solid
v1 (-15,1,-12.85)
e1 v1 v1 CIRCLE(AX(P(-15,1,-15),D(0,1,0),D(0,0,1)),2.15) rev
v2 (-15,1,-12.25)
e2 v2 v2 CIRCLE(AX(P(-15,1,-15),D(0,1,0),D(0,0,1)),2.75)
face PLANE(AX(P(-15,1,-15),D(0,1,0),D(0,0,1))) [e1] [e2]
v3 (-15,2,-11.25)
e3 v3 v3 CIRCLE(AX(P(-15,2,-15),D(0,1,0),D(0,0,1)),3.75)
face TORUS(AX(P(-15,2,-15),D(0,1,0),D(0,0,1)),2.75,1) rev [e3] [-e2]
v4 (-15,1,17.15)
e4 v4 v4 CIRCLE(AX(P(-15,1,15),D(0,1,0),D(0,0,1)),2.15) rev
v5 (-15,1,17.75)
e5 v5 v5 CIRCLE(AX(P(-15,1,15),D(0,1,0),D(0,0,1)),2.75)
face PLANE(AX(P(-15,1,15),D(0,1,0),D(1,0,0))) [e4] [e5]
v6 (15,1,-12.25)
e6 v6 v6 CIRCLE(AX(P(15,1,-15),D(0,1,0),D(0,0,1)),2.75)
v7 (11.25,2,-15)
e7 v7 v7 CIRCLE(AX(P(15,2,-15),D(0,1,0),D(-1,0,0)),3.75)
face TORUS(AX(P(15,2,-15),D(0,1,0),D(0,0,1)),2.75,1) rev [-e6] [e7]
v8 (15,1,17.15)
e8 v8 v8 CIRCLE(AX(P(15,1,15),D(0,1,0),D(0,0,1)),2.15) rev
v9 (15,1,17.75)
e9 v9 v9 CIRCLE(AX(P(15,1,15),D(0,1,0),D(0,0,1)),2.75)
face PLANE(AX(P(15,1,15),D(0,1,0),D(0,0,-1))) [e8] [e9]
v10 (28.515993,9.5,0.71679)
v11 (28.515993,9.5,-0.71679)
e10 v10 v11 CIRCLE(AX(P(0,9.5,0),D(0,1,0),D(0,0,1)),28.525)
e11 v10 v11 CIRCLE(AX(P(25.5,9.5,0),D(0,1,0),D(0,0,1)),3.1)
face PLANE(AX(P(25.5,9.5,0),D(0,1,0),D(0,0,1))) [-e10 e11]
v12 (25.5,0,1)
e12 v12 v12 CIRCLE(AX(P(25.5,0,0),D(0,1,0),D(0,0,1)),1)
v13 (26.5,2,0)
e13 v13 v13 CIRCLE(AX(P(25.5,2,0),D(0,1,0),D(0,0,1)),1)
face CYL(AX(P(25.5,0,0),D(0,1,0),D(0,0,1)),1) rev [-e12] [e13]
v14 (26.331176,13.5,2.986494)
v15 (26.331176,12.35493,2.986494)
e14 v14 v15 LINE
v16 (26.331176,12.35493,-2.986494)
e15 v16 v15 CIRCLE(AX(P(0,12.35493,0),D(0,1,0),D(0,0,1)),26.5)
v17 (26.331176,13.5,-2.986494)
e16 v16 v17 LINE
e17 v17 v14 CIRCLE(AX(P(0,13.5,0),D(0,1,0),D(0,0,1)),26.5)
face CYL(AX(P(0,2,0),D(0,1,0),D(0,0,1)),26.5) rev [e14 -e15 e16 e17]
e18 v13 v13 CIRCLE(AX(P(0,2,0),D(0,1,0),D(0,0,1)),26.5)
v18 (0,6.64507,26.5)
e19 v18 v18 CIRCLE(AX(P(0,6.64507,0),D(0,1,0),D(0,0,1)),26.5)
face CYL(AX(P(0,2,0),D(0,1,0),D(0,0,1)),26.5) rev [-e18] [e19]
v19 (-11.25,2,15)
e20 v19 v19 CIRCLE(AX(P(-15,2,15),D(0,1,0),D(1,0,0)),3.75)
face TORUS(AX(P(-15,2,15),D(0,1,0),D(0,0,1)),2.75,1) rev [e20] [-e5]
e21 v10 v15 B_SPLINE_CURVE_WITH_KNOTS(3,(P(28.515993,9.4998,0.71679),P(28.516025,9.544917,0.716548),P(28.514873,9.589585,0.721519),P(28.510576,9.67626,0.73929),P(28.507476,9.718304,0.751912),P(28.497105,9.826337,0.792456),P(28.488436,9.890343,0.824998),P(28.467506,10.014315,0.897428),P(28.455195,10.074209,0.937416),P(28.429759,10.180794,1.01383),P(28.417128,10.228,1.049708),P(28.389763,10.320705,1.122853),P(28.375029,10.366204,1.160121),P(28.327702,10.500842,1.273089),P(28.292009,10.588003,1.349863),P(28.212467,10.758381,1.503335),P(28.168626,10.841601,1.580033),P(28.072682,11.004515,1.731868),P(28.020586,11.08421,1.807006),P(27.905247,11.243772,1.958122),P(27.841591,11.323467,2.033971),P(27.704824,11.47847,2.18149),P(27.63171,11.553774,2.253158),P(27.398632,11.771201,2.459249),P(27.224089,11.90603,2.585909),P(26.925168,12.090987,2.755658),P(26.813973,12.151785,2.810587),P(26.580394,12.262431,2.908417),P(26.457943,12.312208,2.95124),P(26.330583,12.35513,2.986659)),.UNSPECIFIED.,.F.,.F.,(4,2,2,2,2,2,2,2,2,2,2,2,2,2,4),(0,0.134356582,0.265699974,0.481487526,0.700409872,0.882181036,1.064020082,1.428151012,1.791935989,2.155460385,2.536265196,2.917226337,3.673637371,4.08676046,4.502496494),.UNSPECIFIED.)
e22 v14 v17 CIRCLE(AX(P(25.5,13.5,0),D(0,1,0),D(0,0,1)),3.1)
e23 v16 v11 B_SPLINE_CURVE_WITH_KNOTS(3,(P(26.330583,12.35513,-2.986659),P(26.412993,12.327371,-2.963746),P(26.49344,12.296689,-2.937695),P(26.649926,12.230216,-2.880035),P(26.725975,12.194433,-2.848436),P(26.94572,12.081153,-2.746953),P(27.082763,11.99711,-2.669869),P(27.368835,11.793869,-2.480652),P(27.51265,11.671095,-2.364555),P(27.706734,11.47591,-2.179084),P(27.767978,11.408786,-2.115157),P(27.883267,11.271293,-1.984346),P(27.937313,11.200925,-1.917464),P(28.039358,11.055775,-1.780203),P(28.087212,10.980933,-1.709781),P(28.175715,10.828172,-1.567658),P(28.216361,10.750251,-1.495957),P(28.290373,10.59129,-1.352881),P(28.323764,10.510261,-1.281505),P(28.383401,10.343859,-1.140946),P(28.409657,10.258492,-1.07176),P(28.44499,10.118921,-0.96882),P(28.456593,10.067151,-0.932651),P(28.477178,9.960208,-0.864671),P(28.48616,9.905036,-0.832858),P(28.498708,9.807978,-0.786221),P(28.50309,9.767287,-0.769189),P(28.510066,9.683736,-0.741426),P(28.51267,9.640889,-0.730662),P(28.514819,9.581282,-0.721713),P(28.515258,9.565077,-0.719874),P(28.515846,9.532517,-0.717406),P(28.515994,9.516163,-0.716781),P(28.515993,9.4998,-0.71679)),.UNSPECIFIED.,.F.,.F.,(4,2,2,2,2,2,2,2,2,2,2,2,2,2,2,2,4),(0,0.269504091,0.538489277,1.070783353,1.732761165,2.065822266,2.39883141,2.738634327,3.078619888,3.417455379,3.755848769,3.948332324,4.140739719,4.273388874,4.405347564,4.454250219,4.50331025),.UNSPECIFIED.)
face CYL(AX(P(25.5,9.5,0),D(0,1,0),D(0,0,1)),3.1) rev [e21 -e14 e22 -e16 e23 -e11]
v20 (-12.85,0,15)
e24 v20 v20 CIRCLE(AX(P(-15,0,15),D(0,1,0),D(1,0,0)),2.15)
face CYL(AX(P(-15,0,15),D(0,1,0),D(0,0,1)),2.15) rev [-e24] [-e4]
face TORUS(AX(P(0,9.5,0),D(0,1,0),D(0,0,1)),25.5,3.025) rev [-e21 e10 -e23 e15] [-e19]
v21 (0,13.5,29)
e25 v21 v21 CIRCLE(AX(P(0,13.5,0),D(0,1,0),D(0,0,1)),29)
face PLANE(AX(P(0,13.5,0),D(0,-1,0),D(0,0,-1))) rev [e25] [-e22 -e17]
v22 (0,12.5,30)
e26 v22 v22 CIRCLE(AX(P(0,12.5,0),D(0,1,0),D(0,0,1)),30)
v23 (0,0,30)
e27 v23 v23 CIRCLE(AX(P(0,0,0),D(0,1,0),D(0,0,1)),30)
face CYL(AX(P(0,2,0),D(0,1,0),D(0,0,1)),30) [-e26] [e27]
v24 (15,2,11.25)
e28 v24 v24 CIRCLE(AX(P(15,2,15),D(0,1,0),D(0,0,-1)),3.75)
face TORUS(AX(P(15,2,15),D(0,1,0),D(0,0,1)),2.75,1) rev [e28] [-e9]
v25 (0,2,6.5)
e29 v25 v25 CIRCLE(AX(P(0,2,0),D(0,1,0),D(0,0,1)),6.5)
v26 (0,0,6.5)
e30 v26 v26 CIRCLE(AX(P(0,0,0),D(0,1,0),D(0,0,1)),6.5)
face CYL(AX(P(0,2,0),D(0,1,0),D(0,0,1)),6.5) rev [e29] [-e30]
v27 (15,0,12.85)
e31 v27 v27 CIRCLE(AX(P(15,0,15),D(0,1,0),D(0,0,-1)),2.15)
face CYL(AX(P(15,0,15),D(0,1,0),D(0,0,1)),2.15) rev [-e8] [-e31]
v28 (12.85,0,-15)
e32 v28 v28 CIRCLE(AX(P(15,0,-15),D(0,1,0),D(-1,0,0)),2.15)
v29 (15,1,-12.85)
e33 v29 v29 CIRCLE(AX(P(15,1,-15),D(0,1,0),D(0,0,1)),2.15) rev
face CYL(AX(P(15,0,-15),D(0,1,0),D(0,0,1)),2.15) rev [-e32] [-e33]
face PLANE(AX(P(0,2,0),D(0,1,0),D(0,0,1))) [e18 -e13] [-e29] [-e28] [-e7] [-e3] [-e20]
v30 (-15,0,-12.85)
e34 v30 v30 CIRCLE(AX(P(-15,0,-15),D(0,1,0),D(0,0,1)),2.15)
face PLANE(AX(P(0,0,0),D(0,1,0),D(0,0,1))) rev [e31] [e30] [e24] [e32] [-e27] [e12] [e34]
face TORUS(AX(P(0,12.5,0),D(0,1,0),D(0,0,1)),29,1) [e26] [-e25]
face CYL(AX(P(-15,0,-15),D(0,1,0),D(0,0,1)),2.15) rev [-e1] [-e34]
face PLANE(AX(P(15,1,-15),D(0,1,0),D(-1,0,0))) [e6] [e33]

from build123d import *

# Parameters (mm, degrees)
SKETCH_3_R                       = 3.1
CUT_EXTRUDE_2_DEPTH              = 4
CUT_EXTRUDE_3_DEPTH              = 44.957365734
SKETCH_5_R                       = 3.75
CUT_EXTRUDE_4_DEPTH              = 1
FILLET_1_R                       = 1
PATTERN_CIRCULAR_1_COUNT         = 4
FILLET_1_OF_PATTERN_CIRCULAR_1_R = 1
SKETCH_6_R                       = 1
CUT_EXTRUDE_5_DEPTH              = 44.957365734


with BuildPart() as part:
    # 草图1 → 旋转2 (revolve)
    with BuildSketch(Plane.XY, mode=Mode.PRIVATE) as revolve_2_sk:
        with BuildLine():
            Line((6.5, 2), (6.5, 0))
            Line((6.5, 0), (30, 0))
            Line((30, 0), (30, 12.5))
            ThreePointArc((30, 12.5), (29.707106781, 13.207106781), (29, 13.5))
            Line((29, 13.5), (26.5, 13.5))
            Line((26.5, 13.5), (26.5, 12.354929947))
            ThreePointArc((26.5, 12.354929947), (28.525, 9.5), (26.5, 6.645070053))
            Line((26.5, 6.645070053), (26.5, 2))
            Line((26.5, 2), (6.5, 2))
        make_face()
    revolve(revolve_2_sk.sketch.rotate(Axis((0, 2, 0), (0, -1, 0)), 90), axis=Axis((0, 2, 0), (0, -1, 0)))

    # 草图3 → 切除-拉伸2 (cut)
    with BuildSketch(Plane(origin=(0, 13.5, 0), x_dir=(1, 0, 0), z_dir=(0, 1, 0))):
        with Locations((25.5, 0)):
            Circle(SKETCH_3_R)
    extrude(amount=-CUT_EXTRUDE_2_DEPTH, mode=Mode.SUBTRACT)

    # 草图4 → 切除-拉伸3 (cut, through all)
    with BuildSketch(Plane(origin=(0, 2, 0), x_dir=(1, 0, 0), z_dir=(0, 1, 0))):
        with BuildLine():
            Line((-15, 12.85), (-15, 15))
            Line((-15, 15), (-12.85, 15))
            ThreePointArc((-12.85, 15), (-16.52027958, 16.52027958), (-15, 12.85))
        make_face()
        with BuildLine():
            Line((-12.85, 15), (-15, 15))
            Line((-15, 15), (-15, 12.85))
            ThreePointArc((-15, 12.85), (-13.47972042, 13.47972042), (-12.85, 15))
        make_face()
    cut_extrude_3 = extrude(amount=-CUT_EXTRUDE_3_DEPTH, mode=Mode.SUBTRACT)

    # 草图5 → 切除-拉伸4 (cut)
    with BuildSketch(Plane(origin=(0, 2, 0), x_dir=(1, 0, 0), z_dir=(0, 1, 0))):
        with Locations(Location((-15, 15, 0), (0, 0, 270))):
            Circle(SKETCH_5_R)
    cut_extrude_4 = extrude(amount=-CUT_EXTRUDE_4_DEPTH, mode=Mode.SUBTRACT)

    # 圆角1
    fillet_1_edges = [part.edges().sort_by_distance(p)[0] for p in [
        (-15, 1, -18.75),
    ]]
    fillet(fillet_1_edges, radius=FILLET_1_R - 0.0001)  # a hair under: the kernel refuses the full size

    # 阵列(圆周)1: 切除-拉伸3, 切除-拉伸4 ×4 about axis
    pattern_circular_1_axis = Axis((0, 0, 0), (0, 1, 0))
    add([cut_extrude_3.rotate(pattern_circular_1_axis, i * 360 / PATTERN_CIRCULAR_1_COUNT) for i in range(1, PATTERN_CIRCULAR_1_COUNT)], mode=Mode.SUBTRACT)
    add([cut_extrude_4.rotate(pattern_circular_1_axis, i * 360 / PATTERN_CIRCULAR_1_COUNT) for i in range(1, PATTERN_CIRCULAR_1_COUNT)], mode=Mode.SUBTRACT)

    # 圆角1 of 阵列(圆周)1
    fillet_1_of_pattern_circular_1_edges = [part.edges().sort_by_distance(p)[0] for p in [
        (-18.75, 1, 15),
        (15, 1, 18.75),
        (18.75, 1, -15),
    ]]
    fillet(fillet_1_of_pattern_circular_1_edges, radius=FILLET_1_OF_PATTERN_CIRCULAR_1_R - 0.0001)  # a hair under: the kernel refuses the full size

    # 草图6 → 切除-拉伸5 (cut, through all)
    with BuildSketch(Plane(origin=(0, 2, 0), x_dir=(1, 0, 0), z_dir=(0, 1, 0))):
        with Locations(Location((25.5, 0, 0), (0, 0, 270))):
            Circle(SKETCH_6_R)
    extrude(amount=-CUT_EXTRUDE_5_DEPTH, mode=Mode.SUBTRACT)


solid = part.part
